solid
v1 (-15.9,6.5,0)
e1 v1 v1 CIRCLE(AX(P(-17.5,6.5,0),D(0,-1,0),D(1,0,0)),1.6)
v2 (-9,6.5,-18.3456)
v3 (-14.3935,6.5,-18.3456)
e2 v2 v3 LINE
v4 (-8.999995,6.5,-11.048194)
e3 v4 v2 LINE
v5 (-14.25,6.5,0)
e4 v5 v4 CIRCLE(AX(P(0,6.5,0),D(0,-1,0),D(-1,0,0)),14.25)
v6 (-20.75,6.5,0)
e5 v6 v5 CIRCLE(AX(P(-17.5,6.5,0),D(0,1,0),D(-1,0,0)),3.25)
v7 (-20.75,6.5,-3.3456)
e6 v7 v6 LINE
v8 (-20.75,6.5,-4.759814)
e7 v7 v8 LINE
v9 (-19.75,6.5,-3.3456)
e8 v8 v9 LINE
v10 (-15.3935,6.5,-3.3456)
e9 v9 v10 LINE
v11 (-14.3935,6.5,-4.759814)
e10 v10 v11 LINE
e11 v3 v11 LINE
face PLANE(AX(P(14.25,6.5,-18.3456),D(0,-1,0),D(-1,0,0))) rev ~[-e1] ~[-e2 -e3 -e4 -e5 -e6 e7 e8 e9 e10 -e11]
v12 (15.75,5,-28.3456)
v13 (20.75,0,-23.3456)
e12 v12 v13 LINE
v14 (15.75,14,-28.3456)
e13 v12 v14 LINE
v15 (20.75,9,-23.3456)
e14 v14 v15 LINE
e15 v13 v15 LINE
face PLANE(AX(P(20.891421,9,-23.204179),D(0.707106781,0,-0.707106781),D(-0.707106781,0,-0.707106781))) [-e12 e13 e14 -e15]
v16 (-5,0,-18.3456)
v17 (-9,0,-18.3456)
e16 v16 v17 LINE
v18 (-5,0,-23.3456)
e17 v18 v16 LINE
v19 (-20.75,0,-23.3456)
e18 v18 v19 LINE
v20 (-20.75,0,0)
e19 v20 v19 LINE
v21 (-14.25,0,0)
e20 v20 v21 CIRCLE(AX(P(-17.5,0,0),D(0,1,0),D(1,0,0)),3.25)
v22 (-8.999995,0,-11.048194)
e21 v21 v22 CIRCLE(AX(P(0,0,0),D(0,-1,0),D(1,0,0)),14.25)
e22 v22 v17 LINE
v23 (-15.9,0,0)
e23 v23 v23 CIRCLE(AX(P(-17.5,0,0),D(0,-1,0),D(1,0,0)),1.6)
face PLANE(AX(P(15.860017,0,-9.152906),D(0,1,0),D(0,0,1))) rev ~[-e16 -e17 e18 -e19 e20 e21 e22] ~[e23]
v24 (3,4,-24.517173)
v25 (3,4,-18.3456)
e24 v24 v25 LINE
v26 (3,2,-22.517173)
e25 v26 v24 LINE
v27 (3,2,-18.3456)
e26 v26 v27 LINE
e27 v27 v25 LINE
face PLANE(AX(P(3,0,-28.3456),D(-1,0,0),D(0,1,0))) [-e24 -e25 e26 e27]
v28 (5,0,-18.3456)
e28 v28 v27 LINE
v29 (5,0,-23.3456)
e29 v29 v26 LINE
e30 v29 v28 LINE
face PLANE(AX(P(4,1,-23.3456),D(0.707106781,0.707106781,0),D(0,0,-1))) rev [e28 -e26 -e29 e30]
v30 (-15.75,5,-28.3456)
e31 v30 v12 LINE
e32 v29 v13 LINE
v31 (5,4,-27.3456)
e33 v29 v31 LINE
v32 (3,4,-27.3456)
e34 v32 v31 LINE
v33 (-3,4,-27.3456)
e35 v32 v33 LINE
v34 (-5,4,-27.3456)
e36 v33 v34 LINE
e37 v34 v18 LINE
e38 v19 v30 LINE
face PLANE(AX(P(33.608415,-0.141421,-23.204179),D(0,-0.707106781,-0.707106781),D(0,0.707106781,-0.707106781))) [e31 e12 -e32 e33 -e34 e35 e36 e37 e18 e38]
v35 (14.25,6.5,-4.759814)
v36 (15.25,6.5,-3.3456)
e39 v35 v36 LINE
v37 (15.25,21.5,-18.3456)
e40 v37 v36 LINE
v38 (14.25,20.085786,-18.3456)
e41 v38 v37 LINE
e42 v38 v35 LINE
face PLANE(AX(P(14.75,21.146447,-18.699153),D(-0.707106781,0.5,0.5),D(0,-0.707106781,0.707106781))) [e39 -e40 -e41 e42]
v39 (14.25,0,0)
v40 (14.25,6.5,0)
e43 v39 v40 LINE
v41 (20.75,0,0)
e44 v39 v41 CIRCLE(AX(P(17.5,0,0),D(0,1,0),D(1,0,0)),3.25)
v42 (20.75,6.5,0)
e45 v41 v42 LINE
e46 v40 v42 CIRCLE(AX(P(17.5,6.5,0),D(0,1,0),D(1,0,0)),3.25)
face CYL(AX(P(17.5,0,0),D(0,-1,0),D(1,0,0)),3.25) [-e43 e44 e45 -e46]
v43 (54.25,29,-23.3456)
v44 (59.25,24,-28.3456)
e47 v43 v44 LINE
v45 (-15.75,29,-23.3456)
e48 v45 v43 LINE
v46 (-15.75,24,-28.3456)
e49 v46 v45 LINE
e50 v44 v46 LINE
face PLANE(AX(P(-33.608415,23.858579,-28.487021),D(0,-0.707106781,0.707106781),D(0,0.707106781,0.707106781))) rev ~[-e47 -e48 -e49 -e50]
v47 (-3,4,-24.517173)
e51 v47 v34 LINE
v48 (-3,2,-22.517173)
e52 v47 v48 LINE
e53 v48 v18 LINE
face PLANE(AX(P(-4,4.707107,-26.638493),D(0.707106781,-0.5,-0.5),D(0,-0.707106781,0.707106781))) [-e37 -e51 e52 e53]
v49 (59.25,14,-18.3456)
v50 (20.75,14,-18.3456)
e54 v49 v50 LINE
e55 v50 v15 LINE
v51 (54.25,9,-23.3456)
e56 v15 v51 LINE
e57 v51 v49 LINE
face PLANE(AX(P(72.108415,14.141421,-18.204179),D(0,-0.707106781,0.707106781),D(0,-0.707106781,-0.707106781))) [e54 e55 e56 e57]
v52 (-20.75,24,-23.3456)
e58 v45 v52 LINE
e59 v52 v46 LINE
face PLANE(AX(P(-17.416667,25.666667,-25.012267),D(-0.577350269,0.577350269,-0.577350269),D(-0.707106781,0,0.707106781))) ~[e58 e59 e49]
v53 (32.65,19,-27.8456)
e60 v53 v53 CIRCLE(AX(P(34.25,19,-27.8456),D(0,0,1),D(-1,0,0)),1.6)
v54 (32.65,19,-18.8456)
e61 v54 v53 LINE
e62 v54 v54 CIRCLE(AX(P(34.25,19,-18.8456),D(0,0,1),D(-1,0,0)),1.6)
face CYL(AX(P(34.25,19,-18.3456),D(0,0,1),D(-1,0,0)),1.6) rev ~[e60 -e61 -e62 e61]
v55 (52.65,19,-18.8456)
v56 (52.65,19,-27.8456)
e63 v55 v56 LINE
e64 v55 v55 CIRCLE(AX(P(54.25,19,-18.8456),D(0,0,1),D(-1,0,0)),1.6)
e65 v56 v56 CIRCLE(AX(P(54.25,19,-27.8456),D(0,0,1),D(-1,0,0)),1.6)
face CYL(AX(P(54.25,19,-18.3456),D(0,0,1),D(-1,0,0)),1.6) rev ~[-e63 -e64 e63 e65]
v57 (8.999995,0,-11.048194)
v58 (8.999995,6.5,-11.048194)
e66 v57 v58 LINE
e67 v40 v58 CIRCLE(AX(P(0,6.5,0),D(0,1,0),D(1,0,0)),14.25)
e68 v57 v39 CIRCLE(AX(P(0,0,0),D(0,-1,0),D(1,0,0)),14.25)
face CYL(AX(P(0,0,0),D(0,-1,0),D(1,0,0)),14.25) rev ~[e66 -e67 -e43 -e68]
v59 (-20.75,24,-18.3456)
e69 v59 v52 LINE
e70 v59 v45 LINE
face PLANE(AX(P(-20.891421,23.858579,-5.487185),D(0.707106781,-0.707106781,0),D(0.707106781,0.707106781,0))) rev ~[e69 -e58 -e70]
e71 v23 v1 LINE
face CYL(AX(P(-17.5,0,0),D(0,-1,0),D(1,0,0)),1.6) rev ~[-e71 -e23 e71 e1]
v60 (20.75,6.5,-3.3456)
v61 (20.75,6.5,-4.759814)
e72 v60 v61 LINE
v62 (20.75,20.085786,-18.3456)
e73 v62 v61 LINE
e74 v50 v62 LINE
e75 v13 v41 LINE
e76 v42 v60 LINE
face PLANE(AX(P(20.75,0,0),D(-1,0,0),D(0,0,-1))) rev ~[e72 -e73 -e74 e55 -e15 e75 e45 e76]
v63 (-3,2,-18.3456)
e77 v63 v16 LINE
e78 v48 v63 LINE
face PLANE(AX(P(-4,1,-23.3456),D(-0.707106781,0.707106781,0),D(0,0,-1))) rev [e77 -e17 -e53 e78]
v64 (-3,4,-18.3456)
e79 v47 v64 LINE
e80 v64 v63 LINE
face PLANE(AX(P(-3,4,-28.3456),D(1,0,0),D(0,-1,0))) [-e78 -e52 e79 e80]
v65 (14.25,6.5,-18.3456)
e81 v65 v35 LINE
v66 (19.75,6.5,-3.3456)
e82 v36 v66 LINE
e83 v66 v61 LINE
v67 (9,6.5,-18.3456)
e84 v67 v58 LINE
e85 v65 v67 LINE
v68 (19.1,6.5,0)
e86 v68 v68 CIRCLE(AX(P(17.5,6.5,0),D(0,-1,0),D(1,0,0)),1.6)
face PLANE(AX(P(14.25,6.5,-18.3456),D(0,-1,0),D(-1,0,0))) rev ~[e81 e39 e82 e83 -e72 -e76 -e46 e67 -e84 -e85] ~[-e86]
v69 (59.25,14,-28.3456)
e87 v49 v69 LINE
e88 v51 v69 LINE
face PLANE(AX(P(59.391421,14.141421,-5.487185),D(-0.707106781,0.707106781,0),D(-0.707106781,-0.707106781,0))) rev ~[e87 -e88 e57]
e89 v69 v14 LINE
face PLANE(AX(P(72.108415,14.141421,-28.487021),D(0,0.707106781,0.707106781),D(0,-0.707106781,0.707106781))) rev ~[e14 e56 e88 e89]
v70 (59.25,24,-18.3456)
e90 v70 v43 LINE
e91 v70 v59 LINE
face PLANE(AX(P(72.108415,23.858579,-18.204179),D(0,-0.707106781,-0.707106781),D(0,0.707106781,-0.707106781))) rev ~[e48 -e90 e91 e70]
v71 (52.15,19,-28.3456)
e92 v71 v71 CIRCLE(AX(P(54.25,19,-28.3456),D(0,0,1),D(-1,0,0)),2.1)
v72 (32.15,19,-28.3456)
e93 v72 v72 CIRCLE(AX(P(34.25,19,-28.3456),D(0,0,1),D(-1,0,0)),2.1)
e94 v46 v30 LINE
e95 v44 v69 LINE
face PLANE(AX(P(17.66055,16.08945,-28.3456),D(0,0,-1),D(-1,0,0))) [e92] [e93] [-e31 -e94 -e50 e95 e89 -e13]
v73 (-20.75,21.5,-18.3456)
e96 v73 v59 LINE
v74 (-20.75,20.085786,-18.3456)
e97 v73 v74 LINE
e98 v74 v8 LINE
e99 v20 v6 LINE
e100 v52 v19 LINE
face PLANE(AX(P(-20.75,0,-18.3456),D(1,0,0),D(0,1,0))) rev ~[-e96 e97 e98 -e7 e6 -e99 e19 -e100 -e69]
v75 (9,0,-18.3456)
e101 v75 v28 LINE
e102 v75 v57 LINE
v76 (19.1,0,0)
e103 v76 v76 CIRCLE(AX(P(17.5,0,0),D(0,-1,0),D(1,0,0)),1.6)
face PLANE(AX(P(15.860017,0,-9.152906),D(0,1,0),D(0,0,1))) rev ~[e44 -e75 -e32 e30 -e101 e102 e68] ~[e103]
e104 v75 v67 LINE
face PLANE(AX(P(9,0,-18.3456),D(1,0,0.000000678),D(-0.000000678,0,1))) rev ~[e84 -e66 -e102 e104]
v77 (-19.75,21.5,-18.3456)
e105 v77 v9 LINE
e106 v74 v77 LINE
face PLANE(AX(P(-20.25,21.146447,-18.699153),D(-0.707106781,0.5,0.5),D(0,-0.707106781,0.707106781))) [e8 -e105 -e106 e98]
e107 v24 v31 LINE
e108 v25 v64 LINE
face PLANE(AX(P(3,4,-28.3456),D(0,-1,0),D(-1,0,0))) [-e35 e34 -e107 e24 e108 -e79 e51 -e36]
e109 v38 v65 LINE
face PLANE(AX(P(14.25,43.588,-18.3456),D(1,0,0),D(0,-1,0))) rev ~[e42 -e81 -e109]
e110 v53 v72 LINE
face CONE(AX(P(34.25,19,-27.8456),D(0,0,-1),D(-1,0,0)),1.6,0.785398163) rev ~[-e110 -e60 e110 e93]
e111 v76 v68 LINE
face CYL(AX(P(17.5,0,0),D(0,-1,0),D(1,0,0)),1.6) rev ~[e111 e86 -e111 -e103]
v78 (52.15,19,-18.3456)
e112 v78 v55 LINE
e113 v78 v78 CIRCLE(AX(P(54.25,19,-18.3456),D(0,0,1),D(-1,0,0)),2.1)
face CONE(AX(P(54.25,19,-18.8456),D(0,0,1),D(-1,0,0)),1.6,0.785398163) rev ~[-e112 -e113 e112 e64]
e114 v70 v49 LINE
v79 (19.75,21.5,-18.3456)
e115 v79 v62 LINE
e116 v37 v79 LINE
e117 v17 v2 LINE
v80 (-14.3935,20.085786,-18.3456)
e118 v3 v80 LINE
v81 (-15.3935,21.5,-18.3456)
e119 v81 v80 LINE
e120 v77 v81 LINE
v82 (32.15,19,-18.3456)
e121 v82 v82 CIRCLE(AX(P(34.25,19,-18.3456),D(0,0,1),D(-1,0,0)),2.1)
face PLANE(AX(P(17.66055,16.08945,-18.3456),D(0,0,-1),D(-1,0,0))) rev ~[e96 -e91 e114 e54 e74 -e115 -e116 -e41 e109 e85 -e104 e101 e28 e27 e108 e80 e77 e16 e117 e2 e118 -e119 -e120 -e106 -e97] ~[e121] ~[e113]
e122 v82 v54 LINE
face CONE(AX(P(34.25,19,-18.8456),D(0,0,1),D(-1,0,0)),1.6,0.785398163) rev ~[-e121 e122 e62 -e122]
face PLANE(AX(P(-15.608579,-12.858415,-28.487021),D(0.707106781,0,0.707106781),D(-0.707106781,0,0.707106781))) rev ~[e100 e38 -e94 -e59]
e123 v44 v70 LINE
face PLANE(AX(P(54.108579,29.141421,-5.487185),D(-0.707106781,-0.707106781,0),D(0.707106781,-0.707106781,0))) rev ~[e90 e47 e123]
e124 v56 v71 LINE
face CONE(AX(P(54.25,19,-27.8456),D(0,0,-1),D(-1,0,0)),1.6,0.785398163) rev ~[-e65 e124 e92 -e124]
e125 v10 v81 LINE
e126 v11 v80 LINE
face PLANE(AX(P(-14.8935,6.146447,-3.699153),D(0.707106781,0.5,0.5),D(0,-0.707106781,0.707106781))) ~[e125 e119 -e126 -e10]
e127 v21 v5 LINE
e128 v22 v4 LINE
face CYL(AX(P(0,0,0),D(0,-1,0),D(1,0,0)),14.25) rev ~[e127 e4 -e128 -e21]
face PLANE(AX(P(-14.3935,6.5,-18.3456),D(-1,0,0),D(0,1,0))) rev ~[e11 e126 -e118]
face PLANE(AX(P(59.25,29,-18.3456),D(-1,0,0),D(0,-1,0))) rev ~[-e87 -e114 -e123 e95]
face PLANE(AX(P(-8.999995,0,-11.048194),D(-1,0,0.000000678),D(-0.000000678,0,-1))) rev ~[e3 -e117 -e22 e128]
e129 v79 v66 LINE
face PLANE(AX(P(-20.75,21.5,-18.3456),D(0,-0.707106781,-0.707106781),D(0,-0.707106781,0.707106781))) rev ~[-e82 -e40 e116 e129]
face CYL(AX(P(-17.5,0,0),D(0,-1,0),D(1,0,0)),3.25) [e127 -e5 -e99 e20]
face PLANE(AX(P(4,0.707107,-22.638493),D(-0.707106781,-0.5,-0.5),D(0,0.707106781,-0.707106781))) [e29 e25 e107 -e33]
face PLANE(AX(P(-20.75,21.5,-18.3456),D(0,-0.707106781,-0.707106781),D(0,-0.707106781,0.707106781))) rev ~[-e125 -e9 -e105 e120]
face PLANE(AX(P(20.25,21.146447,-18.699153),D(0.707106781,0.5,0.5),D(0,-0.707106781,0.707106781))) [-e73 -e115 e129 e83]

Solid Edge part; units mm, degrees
sketch "Sketch1" plane through (0, 0, 0) normal (0, -1, 0) x (1, 0, 0)
  circle A0 centre (-17.5, 0) radius 1.6
  line L0 (-20.75, -18.3456) -> (-20.75, 0)
  line L1 (-9, -18.3456) -> (-20.75, -18.3456)
  line L2 (-9, -11.0482) -> (-9, -18.3456)
  arc A1 (-14.25, 0) -> (-9, -11.0482) centre (0, 0) ccw
  arc A2 (-20.75, 0) -> (-14.25, 0) centre (-17.5, 0) cw
  arc A3 (9, -11.0482) -> (14.25, 0) centre (0, 0) ccw
  arc A4 (14.25, 0) -> (20.75, 0) centre (17.5, 0) cw
  line L3 (20.75, 0) -> (20.75, -18.3456)
  line L4 (20.75, -18.3456) -> (9, -18.3456)
  line L5 (9, -18.3456) -> (9, -11.0482)
  circle A5 centre (17.5, 0) radius 1.6
  dimension "D1" = 35
  dimension "D2" = 17.5
  dimension "D3" = 6.5
  dimension "D4" = 9
  dimension "D5" = 9
extrude "Protrusion1" add sketch "Sketch1" against normal blind 6.5
sketch "Sketch2" plane through (14.875, 3.25, -18.3456) normal (0, 0, -1) x (0, -1, 0)
  line L0 (3.25, 35.625) -> (-25.75, 35.625)
  line L1 (-25.75, 35.625) -> (-25.75, -44.375)
  line L2 (-25.75, -44.375) -> (-5.75, -44.375)
  line L3 (-5.75, -44.375) -> (-5.75, -5.875)
  line L4 (-5.75, -5.875) -> (3.25, -5.875)
  line L5 (3.25, -5.875) -> (3.25, 35.625)
  dimension "D1" = 41.5
  dimension "D2" = 80
  dimension "D3" = 20
  dimension "D4" = 29
extrude "ExtrudedProtrusion_3" add sketch "Sketch2" along normal blind 10
sketch "Sketch3" plane through (9.25, 14.5, -28.3456) normal (0, 0, -1) x (0, 1, 0)
  line L0 (-14.5, -6.25) -> (-10.5, -6.25)
  line L1 (-10.5, -6.25) -> (-10.5, -12.25)
  line L2 (-10.5, -12.25) -> (-14.5, -12.25)
  line L3 (-14.5, -12.25) -> (-14.5, -6.25)
  dimension "D1" = 4
  dimension "D2" = 6
extrude "ExtrudedCutout_1" cut sketch "Sketch3" against normal blind 45
sketch "Sketch4" plane through (-20.75, 14.5, -14.1728) normal (-1, 0, 0) x (0, 1, 0)
  line L0 (-8, 4.1728) -> (-8, -10.8272)
  line L1 (7, 4.1728) -> (-8, -10.8272)
  line L2 (-8, 4.1728) -> (7, 4.1728)
  dimension "D1" = 15
  dimension "D2" = 15
extrude "Protrusion2" add sketch "Sketch4" against normal up to vertex (41.5 mm away)
sketch "Sketch5" plane through (9.25, 19, -18.3456) normal (0, 0, 1) x (1, 0, 0)
  line L0 (-23.6435, -12.5) -> (-23.6435, 24.588)
  line L1 (-23.6435, 24.588) -> (5, 24.588)
  line L2 (5, 24.588) -> (5, -12.5)
  line L3 (5, -12.5) -> (-23.6435, -12.5)
extrude "ExtrudedCutout_2" cut sketch "Sketch5" along normal blind 110
sketch "Sketch6" plane through (19.25, 14.5, -18.3456) normal (0, 0, 1) x (-1, 0, 0)
  circle A0 centre (-35, -4.5) radius 1.6
  circle A1 centre (-15, -4.5) radius 1.6
extrude "Cutout1" cut sketch "Sketch6" against normal up to vertex (24.5 mm away)
chamfer "Letörés_1" distance 5 angle 45 11 edges at (19.25, 29, -28.3456) (-20.75, 29, -23.3456) (19.25, 29, -18.3456) (59.25, 29, -23.3456) (59.25, 9, -23.3456) (40, 9, -28.3456) (11.875, 0, -28.3456) (-11.875, 0, -28.3456) (40, 9, -18.3456) (-20.75, 14.5, -28.3456) (20.75, 4.5, -28.3456)
chamfer "Letörés_2" distance 1 angle 45 4 edges at (20.75, 14, -10.8456) (14.25, 14, -10.8456) (-14.3935, 14, -10.8456) (-20.75, 14, -10.8456)
chamfer "Letörés_3" distance 0.5 angle 45 4 edges at (35.85, 19, -28.3456) (35.85, 19, -18.3456) (55.85, 19, -28.3456) (55.85, 19, -18.3456)
chamfer "Letörés_4" distance 2 angle 45 4 edges at (3, 0, -20.8456) (3, 2, -25.3456) (-3, 2, -25.3456) (-3, 0, -20.8456)
